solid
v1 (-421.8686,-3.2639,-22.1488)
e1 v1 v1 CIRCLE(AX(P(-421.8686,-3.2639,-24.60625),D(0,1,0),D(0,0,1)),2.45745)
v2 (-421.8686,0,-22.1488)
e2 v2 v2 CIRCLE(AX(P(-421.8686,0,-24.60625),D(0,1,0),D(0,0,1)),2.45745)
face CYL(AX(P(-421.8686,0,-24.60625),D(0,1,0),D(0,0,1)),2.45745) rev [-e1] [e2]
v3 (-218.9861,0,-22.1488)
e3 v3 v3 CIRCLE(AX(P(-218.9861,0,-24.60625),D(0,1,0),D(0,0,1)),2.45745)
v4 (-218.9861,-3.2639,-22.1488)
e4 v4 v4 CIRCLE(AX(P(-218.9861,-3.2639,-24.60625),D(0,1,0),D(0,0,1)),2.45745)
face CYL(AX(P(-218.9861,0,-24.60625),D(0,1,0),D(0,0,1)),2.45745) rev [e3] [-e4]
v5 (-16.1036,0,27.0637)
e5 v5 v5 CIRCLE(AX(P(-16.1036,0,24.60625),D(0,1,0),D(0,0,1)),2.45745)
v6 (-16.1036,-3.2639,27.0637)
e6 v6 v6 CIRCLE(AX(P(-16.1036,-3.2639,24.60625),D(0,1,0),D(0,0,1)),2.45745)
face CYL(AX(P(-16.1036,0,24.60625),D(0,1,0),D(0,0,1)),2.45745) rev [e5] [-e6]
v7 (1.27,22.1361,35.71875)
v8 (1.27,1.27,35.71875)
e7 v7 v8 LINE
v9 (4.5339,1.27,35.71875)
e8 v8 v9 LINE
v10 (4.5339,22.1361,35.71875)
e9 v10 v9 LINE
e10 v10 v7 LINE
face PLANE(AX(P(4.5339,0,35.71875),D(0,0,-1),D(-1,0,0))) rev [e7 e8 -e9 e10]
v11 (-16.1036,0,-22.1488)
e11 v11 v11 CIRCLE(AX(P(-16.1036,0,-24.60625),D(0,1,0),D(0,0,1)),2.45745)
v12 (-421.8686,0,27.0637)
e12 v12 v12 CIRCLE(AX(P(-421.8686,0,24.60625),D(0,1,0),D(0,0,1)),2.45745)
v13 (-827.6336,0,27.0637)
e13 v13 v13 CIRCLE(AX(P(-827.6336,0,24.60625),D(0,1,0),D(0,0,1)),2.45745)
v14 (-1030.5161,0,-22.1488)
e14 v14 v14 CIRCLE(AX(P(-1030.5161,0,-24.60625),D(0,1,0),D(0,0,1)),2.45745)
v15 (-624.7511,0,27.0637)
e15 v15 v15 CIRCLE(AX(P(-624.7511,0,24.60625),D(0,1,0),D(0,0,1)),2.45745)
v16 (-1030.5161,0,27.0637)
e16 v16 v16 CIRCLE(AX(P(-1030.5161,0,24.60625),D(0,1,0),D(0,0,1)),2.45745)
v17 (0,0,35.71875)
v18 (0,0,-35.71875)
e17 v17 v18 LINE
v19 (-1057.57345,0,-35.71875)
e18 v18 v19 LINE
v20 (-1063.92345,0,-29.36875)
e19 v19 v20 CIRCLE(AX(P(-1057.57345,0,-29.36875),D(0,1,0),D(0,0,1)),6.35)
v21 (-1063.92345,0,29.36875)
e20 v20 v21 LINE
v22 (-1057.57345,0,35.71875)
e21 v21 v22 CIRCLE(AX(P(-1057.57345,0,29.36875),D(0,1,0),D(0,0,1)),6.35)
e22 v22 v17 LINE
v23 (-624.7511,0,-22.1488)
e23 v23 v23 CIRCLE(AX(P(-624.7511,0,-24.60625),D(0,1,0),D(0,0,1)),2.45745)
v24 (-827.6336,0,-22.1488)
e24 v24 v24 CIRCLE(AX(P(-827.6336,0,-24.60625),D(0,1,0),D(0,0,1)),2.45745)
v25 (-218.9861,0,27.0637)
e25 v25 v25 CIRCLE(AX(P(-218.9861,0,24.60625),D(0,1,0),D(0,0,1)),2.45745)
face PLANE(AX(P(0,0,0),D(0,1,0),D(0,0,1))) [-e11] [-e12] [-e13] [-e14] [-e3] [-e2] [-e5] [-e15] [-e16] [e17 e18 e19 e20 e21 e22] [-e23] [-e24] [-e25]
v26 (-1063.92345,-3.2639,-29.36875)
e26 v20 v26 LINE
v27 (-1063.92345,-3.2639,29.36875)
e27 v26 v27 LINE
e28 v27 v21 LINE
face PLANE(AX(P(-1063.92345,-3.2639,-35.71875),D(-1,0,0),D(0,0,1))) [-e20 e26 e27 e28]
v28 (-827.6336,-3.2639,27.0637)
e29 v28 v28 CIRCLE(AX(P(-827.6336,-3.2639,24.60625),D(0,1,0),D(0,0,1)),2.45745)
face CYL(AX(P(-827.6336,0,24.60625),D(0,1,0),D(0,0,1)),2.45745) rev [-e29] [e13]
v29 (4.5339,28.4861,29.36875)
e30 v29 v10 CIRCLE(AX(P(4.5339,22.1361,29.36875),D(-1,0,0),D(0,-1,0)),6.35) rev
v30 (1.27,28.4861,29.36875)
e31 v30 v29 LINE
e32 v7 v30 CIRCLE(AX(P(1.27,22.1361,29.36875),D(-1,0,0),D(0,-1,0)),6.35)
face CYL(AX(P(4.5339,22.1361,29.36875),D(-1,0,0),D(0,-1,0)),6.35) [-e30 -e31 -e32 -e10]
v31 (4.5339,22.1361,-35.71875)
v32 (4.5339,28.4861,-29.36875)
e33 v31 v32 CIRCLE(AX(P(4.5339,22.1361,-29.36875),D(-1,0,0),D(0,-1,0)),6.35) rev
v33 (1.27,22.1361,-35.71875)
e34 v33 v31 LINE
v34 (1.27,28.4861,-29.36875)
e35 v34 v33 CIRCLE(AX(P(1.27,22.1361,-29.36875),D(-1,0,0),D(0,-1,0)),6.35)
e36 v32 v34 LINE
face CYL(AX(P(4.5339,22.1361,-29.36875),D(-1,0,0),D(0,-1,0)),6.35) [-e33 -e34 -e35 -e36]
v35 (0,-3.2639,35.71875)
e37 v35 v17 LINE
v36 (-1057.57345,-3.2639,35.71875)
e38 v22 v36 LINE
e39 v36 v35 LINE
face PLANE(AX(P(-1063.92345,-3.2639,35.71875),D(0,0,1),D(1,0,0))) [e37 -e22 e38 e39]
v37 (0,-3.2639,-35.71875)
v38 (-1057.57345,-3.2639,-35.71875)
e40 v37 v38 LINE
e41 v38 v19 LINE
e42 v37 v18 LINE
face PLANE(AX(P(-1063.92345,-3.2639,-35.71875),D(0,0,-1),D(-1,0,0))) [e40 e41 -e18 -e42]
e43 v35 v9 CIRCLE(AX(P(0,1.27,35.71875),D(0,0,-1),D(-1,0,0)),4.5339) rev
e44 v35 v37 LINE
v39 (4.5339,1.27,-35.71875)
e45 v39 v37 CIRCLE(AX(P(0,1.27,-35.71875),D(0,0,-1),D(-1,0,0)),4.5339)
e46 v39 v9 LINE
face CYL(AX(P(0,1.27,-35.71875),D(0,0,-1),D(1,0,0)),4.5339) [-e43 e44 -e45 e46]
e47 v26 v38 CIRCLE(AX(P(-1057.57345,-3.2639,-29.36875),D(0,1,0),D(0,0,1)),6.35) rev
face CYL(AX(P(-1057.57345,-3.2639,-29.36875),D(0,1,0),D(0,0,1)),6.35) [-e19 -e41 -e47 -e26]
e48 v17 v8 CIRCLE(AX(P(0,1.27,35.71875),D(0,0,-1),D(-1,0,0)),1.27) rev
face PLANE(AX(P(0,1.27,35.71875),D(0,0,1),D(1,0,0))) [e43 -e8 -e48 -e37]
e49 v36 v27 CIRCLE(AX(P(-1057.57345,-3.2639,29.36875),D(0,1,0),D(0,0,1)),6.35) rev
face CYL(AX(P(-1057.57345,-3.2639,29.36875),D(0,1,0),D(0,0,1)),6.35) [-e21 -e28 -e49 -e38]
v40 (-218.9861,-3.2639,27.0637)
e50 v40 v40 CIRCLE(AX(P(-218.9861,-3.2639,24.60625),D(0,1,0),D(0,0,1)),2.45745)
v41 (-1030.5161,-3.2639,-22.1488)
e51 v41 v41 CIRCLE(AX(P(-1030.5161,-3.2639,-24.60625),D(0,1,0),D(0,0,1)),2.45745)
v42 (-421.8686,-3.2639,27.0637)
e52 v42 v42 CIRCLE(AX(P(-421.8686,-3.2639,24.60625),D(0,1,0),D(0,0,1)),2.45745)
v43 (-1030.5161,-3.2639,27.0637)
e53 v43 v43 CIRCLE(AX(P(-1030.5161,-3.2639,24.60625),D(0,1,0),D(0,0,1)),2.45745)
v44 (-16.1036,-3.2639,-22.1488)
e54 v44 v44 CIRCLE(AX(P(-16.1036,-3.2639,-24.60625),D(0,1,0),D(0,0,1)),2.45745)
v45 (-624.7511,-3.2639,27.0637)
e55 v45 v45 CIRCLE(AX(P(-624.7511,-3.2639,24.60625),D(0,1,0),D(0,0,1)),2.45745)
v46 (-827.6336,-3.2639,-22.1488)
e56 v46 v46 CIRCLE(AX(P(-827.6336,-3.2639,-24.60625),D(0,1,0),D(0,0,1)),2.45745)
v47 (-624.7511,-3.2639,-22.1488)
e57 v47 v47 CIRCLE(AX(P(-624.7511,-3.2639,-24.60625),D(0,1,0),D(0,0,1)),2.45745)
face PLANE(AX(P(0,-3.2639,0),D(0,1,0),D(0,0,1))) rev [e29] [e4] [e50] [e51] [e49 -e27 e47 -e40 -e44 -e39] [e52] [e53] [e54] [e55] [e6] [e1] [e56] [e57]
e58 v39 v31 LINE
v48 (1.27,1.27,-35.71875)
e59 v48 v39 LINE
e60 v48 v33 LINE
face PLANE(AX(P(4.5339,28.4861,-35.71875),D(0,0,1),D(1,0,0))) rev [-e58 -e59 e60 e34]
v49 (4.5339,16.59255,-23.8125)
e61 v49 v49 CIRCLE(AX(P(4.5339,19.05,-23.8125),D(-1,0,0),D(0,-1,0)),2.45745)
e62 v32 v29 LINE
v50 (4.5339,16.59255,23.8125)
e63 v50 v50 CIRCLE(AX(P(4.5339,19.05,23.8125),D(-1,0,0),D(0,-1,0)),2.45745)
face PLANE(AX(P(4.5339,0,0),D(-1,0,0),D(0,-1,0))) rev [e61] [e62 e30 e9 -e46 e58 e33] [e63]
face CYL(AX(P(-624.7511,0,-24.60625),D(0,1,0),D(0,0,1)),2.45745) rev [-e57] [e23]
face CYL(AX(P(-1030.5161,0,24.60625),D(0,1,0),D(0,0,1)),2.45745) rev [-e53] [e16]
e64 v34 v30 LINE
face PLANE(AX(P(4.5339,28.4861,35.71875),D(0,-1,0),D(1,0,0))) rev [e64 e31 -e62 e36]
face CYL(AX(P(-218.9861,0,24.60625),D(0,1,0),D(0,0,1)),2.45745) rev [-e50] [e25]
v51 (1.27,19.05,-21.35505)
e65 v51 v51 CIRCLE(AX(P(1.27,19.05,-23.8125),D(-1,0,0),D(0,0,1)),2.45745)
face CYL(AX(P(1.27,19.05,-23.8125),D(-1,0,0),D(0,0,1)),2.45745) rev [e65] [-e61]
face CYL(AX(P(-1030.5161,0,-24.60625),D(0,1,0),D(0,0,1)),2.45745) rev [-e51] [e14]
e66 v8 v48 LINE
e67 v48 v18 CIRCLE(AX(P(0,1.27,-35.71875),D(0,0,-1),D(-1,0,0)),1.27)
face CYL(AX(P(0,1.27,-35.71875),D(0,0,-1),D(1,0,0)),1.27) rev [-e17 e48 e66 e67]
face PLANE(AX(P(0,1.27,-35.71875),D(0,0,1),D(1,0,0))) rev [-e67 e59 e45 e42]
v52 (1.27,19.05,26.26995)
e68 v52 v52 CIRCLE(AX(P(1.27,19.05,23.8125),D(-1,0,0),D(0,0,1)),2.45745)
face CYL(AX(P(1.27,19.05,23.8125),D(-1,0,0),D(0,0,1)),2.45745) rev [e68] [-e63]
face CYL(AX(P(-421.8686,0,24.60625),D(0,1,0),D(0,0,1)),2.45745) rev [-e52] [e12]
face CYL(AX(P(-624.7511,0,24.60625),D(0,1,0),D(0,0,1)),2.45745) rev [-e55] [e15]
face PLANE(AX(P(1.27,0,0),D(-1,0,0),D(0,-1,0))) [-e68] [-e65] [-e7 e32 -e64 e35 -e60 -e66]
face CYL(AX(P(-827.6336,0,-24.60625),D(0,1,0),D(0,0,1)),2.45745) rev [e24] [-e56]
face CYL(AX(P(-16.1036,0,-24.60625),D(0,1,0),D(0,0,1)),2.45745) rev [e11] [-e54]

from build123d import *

# Parameters (mm, degrees)
SKETCH1_W                    = 1063.92345
SKETCH1_H                    = 71.4375
BASE_FLANGE1_DEPTH           = 3.2639
EDGE_FLANGE2_DEPTH           = 71.4375
F_10_0_1935_DIAMETER_HOLE1_D = 4.9149
LPATTERN1_COUNT              = 6
LPATTERN1_PITCH              = 202.8825
F_10_0_1935_DIAMETER_HOLE2_D = 4.9149
FILLET1_R                    = 6.35


# Sheet-metal steps are written as plain solids
with BuildPart() as part:
    # Sketch1 → Base-Flange1 (new body)
    with BuildSketch(Plane(origin=(0, 0, 0), x_dir=(1, 0, 0), z_dir=(0, 1, 0))):
        with Locations((-531.961725, 0)):
            Rectangle(SKETCH1_W, SKETCH1_H)
    extrude(amount=-BASE_FLANGE1_DEPTH)

    # Edge-Flange2 section (across the edge) → Edge-Flange2 (add)
    with BuildSketch(Plane(origin=(1.27, 0, 35.71875), x_dir=(-1, 0, 0), z_dir=(0, 0, -1))):
        with BuildLine():
            Line((-3.2639, 1.27), (-3.2639, 28.4861))
            Line((-3.2639, 28.4861), (0, 28.4861))
            Line((0, 28.4861), (0, 1.27))
            ThreePointArc((0, 1.27), (0.371974388, 0.371974388), (1.27, 0))
            Line((1.27, 0), (1.27, -3.2639))
            ThreePointArc((1.27, -3.2639), (-1.935951435, -1.935951435), (-3.2639, 1.27))
        make_face()
    extrude(amount=EDGE_FLANGE2_DEPTH)

    # #10 (0.1935) Diameter Hole1 (through all)
    with Locations(Plane(origin=(0, 0, 0), x_dir=(1, 0, 0), z_dir=(0, 1, 0))):
        with Locations((-16.1036, 24.60625), (-16.1036, -24.60625)):
            f_10_0_1935_diameter_hole1 = Hole(F_10_0_1935_DIAMETER_HOLE1_D / 2)

    # LPattern1: #10 (0.1935) Diameter Hole1 ×6
    with Locations(*[(-i * LPATTERN1_PITCH, 0, 0) for i in range(1, LPATTERN1_COUNT)]):
        add(f_10_0_1935_diameter_hole1, mode=Mode.SUBTRACT)

    # #10 (0.1935) Diameter Hole2 (through all)
    with Locations(Plane.ZY.offset(-1.27)):
        with Locations((-23.8125, 19.05), (23.8125, 19.05)):
            Hole(F_10_0_1935_DIAMETER_HOLE2_D / 2)

    # Fillet1
    fillet1_edges = [part.edges().sort_by_distance(p)[0] for p in [
        (2.90195, 28.4861, 35.71875),
        (2.90195, 28.4861, -35.71875),
        (-1063.92345, -1.63195, -35.71875),
        (-1063.92345, -1.63195, 35.71875),
    ]]
    fillet(fillet1_edges, radius=FILLET1_R)


solid = part.part
